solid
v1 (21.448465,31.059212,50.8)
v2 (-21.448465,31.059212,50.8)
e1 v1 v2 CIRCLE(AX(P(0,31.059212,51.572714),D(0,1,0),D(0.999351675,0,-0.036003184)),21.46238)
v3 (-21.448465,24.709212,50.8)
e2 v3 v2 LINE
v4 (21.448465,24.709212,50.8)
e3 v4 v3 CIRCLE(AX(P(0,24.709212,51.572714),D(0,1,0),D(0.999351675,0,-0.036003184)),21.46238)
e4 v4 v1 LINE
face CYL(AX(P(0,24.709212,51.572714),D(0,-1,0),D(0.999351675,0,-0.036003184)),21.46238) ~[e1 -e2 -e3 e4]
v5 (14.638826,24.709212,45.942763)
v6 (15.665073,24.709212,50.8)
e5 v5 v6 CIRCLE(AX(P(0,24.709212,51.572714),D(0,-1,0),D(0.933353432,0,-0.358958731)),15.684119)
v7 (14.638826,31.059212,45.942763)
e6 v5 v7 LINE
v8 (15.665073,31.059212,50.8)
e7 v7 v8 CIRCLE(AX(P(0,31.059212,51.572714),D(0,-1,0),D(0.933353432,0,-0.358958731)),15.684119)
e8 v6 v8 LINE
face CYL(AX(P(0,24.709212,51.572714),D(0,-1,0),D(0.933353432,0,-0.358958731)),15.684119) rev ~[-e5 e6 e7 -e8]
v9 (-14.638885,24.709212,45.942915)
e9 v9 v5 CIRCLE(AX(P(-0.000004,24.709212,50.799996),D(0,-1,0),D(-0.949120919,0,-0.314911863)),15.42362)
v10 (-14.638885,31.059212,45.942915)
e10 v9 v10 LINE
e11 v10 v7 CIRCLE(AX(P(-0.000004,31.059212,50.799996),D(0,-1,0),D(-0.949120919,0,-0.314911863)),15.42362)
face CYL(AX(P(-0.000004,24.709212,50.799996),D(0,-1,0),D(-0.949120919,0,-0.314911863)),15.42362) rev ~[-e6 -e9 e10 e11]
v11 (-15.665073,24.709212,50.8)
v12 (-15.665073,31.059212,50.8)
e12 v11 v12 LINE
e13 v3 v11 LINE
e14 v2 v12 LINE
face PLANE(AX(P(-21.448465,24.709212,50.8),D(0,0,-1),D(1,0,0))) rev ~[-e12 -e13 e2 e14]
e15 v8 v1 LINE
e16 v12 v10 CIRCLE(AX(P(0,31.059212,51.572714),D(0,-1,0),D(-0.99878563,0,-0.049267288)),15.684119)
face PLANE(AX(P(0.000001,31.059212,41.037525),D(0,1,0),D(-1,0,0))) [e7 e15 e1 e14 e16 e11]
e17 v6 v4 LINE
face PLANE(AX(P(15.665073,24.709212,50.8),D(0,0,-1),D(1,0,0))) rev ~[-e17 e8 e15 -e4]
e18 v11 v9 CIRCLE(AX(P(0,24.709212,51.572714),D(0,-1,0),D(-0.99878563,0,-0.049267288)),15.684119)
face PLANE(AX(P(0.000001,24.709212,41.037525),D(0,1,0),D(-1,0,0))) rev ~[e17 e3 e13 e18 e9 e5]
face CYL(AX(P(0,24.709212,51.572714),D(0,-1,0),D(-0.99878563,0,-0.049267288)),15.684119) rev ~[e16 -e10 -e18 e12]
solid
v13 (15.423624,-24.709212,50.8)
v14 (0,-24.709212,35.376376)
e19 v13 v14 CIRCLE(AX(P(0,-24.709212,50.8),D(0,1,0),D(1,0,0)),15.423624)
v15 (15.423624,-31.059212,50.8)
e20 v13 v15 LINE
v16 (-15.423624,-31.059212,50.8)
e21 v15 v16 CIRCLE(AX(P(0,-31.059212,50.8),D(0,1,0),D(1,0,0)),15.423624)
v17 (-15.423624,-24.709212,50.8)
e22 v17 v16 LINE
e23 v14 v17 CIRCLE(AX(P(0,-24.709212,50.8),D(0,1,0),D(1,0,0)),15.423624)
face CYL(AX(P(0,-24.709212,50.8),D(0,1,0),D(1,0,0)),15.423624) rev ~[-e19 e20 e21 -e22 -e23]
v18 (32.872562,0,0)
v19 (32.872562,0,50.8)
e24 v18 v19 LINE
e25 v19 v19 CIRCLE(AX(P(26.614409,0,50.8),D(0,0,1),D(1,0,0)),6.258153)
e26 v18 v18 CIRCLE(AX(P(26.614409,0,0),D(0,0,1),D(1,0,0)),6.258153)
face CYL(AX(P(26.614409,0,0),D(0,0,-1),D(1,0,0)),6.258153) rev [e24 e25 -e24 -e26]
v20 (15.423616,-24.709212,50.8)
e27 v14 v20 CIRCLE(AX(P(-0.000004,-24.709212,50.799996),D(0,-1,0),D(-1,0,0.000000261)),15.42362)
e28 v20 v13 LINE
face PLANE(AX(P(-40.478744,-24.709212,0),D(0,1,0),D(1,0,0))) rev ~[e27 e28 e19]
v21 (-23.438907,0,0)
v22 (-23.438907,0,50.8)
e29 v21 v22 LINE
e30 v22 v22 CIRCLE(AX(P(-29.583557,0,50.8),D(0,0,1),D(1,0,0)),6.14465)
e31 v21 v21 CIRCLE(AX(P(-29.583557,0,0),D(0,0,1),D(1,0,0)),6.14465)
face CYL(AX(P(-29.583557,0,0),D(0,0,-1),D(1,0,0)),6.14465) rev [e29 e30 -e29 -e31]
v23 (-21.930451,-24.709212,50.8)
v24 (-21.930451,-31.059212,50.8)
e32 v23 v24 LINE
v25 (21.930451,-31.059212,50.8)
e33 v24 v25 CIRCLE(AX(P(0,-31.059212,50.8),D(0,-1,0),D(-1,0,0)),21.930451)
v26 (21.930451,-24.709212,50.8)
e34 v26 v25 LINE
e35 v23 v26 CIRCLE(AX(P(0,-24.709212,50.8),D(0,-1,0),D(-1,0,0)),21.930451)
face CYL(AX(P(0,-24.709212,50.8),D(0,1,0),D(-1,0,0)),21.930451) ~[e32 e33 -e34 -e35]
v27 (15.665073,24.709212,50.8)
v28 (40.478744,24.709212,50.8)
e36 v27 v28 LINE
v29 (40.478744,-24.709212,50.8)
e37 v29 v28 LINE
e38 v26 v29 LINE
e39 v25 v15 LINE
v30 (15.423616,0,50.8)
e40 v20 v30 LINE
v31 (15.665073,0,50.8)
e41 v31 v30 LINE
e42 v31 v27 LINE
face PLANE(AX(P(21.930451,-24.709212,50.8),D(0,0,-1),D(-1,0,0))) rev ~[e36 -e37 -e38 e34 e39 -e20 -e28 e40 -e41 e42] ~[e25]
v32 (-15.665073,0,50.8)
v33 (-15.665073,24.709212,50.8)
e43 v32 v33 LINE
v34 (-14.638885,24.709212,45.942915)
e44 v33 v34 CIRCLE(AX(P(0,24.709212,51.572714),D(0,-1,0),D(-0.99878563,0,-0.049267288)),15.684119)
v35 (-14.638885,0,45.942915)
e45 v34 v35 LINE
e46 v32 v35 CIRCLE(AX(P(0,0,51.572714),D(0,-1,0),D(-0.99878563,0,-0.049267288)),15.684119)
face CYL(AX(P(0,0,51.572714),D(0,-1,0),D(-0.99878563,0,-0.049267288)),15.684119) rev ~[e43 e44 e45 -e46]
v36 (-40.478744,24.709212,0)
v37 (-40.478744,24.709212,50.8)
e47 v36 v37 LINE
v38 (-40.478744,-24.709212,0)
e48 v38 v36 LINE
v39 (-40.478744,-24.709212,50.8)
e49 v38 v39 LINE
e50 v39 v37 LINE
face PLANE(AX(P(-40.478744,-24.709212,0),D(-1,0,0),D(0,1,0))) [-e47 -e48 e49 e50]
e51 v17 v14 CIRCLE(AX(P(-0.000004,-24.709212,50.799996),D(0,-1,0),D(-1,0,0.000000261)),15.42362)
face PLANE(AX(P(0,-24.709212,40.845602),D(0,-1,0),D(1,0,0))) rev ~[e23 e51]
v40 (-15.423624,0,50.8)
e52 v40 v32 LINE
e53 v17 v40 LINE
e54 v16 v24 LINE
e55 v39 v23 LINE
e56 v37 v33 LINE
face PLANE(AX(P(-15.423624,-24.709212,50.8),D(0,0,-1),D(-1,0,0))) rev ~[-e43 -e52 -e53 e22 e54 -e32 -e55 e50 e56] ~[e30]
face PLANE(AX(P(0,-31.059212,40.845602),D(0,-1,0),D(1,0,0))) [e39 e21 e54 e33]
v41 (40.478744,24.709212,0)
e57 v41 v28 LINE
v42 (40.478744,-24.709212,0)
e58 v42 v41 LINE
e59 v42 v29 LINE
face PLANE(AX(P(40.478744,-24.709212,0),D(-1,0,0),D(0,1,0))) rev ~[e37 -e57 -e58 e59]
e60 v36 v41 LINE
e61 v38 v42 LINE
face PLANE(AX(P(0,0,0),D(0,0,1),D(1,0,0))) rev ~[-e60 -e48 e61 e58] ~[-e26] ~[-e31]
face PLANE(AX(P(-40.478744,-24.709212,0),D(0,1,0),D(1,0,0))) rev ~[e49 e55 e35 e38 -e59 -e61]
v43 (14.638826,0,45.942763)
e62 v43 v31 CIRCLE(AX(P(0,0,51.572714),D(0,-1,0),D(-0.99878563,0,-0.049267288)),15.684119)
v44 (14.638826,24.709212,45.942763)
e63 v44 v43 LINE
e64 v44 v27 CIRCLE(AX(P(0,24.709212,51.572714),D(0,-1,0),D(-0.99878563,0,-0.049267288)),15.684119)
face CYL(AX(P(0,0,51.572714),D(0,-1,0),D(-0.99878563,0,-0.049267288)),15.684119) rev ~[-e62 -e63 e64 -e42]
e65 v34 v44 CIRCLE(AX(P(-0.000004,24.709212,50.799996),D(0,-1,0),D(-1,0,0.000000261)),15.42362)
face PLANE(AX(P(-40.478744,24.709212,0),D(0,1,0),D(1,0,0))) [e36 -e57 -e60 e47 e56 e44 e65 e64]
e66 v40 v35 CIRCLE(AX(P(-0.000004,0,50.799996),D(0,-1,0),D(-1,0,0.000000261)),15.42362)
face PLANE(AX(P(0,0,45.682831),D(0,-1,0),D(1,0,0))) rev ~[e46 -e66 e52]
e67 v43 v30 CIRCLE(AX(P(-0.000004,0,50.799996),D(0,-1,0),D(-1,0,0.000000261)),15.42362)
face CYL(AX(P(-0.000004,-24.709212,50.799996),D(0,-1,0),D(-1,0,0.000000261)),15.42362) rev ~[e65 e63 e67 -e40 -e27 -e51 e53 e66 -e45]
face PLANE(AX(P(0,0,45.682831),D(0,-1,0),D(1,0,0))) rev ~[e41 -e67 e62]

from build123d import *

# Parameters (mm, degrees)
F0_W     = 80.9574872255
F0_H     = 49.4184233248
F0_R     = 6.1446499531
F0_R_2   = 6.2581528025
F1_DEPTH = 50.8
F3_DEPTH = 24.7092116624
F5_DEPTH = 49.4194233248
F7_DEPTH = 6.35
F9_DEPTH = 6.35


# Not quite as in the source:
# - ends of sketch curves that miss each other by under 0.0002 mm in the source are joined


with BuildPart() as f1:
    # F0 (on Top) → F1 (new body)
    with BuildSketch(Plane.XY):
        Rectangle(F0_W, F0_H)
        with Locations((-29.5835565776, 0)):
            Circle(F0_R, mode=Mode.SUBTRACT)
        with Locations((26.6144089401, 0)):
            Circle(F0_R_2, mode=Mode.SUBTRACT)
    extrude(amount=F1_DEPTH)

    # F2 (on Front) → F3 (cut, through all)
    with BuildSketch(Plane.XZ):
        with BuildLine():
            Line((15.6650725744, 50.8), (-15.6650725744, 50.8))
            ThreePointArc((-15.6650725744, 50.8), (0, 35.8885951003), (15.6650725744, 50.8))
        make_face()
    extrude(amount=-F3_DEPTH, mode=Mode.SUBTRACT)

    # F4 (on face) → F5 (cut, through all)
    with BuildSketch(Plane.XZ.offset(24.7092116624)):
        with BuildLine():
            Line((15.4236163944, 50.8), (-15.4236244361, 50.8))
            ThreePointArc((-15.4236244361, 50.8), (0, 35.3763755639), (15.4236163944, 50.8))
        make_face()
    extrude(amount=-F5_DEPTH, mode=Mode.SUBTRACT)

    # F8 (on face) → F9 (join)
    with BuildSketch(Plane.XZ.offset(24.7092116624)):
        with BuildLine():
            ThreePointArc((15.4236244361, 50.8), (0, 35.3763755639), (-15.4236244361, 50.8))
            Line((-15.4236244361, 50.8), (-21.9304505736, 50.8))
            ThreePointArc((-21.9304505736, 50.8), (0, 28.8695494264), (21.9304505736, 50.8))
            Line((21.9304505736, 50.8), (15.4236244361, 50.8))
        make_face()
    extrude(amount=F9_DEPTH)


with BuildPart() as f7:
    # F6 (on face) → F7 (new body)
    with BuildSketch(Plane(origin=(0, 24.7092116624, 0), x_dir=(-1, 0, 0), z_dir=(0, 1, 0))):
        with BuildLine():
            ThreePointArc((-14.638826209, 45.9427625882), (-15.3453497577, 48.3305192967), (-15.6650725744, 50.8))
            Line((-15.6650725744, 50.8), (-21.4484650642, 50.8))
            ThreePointArc((-21.4484650642, 50.8), (0, 30.1103343441), (21.4484650642, 50.8))
            Line((21.4484650642, 50.8), (15.6650725744, 50.8))
            ThreePointArc((15.6650725744, 50.8), (15.3453666282, 48.330599146), (14.638884799, 45.9429149343))
            ThreePointArc((14.638884799, 45.9429149343), (8.42774e-05, 35.3763755642), (-14.638826209, 45.9427625882))
        make_face()
    extrude(amount=F7_DEPTH)


solid = Compound([f1.part, f7.part])
